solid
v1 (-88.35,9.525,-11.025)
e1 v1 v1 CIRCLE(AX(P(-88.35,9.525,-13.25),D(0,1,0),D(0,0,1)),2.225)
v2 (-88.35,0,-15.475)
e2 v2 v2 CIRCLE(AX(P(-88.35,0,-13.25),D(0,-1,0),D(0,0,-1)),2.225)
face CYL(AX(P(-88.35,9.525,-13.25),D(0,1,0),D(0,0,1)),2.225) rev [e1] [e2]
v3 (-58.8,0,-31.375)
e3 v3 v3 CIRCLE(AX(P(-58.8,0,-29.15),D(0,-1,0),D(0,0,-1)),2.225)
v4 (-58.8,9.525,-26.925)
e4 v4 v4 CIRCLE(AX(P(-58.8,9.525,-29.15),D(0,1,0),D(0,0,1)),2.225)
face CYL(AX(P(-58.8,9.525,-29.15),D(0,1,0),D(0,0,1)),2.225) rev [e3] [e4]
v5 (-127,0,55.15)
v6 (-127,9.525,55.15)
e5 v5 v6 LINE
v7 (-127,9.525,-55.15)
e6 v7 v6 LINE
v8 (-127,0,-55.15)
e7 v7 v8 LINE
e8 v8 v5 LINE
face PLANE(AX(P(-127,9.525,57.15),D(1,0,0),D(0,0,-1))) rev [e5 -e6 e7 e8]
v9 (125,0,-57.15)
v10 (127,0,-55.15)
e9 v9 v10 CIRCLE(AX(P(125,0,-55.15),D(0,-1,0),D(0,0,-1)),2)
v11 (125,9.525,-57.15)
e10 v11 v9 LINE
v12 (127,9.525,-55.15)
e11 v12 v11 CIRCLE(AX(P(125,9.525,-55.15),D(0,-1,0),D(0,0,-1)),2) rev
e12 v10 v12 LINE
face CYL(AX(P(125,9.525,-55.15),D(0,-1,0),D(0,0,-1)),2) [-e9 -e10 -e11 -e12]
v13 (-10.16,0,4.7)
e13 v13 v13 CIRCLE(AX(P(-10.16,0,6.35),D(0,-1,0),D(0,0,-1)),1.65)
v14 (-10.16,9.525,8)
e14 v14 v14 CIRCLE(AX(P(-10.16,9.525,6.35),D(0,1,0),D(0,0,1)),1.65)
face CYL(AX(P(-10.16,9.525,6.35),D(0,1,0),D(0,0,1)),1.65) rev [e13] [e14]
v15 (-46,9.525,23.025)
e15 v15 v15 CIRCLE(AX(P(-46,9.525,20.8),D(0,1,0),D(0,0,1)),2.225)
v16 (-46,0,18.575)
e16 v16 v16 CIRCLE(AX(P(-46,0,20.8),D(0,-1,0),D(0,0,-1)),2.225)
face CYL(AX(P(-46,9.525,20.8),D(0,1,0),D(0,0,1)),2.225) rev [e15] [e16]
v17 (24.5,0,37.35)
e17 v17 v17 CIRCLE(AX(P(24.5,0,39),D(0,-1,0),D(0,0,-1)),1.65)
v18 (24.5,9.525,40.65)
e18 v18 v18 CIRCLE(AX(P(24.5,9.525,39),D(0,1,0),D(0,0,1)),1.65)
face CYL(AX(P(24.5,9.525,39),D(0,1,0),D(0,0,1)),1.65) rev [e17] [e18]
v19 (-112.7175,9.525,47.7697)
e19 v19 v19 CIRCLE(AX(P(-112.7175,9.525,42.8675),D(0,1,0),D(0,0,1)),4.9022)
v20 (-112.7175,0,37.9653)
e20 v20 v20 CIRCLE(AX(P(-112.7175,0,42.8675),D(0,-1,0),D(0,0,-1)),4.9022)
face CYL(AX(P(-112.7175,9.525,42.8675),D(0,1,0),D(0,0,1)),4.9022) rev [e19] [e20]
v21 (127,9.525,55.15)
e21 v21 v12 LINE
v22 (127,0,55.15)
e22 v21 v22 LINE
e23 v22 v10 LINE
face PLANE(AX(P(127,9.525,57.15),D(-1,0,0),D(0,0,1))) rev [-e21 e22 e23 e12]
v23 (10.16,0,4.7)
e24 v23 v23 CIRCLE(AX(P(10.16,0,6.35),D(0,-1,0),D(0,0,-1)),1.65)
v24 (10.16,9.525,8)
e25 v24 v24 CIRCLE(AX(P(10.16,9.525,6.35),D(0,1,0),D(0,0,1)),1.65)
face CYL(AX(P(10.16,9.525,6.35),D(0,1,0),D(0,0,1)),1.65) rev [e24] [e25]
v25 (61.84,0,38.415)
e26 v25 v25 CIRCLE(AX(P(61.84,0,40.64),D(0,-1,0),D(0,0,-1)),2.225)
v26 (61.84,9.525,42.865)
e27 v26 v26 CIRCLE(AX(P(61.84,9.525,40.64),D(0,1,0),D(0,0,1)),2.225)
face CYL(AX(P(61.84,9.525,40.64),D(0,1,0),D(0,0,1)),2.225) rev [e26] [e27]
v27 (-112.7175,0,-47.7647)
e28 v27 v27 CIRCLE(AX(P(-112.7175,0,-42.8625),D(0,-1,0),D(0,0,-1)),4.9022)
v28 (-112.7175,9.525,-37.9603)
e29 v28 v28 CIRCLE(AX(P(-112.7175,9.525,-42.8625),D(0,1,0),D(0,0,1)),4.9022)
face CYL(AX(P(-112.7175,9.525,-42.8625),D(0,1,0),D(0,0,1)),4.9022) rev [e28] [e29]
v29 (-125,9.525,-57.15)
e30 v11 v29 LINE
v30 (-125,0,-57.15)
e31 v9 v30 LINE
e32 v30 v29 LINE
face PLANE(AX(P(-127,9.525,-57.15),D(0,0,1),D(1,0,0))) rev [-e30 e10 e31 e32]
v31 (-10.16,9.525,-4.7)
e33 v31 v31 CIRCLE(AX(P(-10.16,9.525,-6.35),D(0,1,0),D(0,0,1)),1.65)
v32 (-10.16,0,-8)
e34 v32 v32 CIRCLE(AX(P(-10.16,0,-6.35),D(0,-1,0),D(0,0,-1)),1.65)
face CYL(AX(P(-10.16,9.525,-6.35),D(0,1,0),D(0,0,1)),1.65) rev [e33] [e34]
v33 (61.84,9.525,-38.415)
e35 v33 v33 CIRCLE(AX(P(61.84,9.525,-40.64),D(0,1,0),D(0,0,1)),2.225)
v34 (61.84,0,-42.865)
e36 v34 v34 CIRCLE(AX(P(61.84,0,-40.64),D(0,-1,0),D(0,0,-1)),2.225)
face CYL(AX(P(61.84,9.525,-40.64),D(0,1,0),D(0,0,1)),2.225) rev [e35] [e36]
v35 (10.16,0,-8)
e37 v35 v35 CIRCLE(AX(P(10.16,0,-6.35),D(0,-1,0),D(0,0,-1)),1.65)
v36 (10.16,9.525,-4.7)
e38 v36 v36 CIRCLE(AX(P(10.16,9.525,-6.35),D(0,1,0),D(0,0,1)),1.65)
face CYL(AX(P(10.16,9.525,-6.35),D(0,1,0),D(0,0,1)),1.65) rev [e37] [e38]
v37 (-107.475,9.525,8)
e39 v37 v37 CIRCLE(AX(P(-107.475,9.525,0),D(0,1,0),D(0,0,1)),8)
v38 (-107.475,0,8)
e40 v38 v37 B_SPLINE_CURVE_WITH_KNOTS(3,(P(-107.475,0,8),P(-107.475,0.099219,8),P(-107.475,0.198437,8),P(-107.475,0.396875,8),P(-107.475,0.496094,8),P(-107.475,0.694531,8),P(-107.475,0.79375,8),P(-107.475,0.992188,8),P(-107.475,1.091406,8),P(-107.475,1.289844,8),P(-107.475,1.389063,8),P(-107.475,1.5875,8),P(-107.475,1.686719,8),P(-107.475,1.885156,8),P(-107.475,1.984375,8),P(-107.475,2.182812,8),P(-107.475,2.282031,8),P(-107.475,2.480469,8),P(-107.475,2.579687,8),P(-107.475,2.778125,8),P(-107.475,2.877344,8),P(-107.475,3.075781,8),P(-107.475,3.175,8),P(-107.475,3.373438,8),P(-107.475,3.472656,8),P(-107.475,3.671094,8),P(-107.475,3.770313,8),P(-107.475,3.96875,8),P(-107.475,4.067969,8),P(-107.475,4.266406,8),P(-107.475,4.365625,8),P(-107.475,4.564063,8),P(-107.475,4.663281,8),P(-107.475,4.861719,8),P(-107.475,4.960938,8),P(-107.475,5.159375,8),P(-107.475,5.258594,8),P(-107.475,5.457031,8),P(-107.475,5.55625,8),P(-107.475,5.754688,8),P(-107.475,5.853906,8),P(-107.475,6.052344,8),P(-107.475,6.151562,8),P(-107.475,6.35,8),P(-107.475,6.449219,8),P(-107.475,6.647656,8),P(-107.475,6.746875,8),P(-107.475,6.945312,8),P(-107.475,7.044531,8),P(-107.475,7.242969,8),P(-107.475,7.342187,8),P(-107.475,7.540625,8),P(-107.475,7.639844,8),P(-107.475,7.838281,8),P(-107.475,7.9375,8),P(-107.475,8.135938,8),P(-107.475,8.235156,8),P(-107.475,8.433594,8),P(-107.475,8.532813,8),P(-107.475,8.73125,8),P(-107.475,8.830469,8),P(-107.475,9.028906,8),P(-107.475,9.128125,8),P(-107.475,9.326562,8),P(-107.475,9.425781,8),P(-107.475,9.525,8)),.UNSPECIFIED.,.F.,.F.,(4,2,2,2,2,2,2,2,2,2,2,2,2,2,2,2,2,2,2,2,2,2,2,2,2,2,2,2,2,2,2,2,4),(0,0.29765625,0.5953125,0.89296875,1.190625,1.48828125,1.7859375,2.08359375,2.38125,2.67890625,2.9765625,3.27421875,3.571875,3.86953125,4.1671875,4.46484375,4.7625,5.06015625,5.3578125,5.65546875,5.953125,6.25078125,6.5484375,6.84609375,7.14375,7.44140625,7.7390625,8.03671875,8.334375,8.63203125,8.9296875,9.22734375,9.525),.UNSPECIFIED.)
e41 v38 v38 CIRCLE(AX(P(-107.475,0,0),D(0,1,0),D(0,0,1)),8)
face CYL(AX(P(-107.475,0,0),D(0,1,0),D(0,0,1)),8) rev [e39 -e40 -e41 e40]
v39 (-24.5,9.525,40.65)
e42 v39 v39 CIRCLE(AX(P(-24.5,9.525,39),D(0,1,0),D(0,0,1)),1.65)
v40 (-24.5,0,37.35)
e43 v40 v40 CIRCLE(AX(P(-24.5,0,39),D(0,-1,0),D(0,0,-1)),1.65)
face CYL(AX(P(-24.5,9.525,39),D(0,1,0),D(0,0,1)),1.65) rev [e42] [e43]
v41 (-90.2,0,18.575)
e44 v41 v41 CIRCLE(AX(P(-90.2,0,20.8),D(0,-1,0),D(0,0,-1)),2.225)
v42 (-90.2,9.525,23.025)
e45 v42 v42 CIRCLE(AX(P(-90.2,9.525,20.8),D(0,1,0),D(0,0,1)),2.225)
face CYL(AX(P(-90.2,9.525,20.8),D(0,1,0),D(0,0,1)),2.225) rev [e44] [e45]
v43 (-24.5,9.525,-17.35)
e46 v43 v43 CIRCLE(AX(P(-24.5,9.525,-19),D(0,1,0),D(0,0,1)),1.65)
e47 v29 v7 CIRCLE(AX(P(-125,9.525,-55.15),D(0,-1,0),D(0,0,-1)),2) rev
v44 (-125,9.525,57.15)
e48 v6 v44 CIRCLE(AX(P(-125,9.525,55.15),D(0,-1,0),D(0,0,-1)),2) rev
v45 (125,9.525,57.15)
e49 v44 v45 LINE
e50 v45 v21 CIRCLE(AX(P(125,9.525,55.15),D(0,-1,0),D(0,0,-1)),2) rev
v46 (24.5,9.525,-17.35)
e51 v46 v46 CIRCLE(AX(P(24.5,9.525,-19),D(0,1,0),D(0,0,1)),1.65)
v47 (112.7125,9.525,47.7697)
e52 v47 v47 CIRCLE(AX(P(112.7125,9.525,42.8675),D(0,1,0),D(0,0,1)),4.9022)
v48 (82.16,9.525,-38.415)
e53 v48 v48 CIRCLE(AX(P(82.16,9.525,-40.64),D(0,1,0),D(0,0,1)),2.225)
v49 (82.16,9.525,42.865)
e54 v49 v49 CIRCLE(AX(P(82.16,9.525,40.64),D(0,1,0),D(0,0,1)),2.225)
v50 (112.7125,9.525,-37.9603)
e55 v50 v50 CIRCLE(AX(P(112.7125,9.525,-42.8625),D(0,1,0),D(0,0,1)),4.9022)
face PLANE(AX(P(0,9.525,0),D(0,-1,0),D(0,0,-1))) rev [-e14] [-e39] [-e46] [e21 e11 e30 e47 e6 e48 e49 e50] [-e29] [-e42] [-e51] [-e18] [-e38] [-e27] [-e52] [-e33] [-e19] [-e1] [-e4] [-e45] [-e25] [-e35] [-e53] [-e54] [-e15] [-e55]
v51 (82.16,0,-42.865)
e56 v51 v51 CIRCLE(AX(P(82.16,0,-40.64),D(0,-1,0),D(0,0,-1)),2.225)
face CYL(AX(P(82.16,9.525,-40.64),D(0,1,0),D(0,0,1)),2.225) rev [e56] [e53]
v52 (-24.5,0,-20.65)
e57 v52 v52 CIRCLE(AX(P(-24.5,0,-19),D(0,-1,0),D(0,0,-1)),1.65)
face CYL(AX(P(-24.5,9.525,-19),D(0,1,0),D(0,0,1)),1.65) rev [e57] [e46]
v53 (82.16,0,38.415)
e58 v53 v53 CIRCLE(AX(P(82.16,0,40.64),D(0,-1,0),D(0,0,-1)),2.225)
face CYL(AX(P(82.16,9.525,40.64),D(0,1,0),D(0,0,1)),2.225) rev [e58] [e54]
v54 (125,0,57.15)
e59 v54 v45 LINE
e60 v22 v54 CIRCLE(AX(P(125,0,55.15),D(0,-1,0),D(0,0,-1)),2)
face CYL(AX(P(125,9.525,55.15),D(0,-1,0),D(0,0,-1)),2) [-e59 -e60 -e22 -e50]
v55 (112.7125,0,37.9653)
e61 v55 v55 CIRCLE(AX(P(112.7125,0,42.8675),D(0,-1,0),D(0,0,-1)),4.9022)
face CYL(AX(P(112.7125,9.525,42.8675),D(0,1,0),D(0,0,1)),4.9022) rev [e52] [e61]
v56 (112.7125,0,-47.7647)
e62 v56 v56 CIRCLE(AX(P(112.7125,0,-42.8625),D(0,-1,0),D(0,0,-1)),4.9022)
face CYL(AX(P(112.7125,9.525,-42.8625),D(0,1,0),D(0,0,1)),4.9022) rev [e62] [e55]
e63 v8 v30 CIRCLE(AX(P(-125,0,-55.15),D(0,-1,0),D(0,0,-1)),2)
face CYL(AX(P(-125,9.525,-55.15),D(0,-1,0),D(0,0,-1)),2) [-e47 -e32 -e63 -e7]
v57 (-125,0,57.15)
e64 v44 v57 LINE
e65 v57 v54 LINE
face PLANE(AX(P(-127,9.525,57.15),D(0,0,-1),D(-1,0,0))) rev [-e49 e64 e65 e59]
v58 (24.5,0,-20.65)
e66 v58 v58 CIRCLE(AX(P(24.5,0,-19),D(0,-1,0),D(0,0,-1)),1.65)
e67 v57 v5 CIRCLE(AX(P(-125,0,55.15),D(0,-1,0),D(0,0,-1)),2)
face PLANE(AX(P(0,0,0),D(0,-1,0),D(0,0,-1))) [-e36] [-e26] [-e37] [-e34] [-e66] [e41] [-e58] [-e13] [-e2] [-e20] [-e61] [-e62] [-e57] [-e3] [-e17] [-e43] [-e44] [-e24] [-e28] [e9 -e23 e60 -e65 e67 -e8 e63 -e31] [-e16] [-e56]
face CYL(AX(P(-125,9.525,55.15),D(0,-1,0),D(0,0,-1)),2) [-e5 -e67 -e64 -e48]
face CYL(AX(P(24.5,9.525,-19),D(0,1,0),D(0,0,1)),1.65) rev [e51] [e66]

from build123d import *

# Parameters (mm, degrees)
SKETCH1_W                      = 254
SKETCH1_H                      = 114.3
BOSS_EXTRUDE1_DEPTH            = 9.525
F_3_8_CLEARANCE_HOLE1_D        = 9.8044
F_3_8_CLEARANCE_HOLE1_DEPTH    = 10
F_3_8_CLEARANCE_HOLE1_TIP      = 2.945538927
M2_5_CLEARANCE_HOLE3_D         = 3.3
M2_5_CLEARANCE_HOLE3_DEPTH     = 10
M2_5_CLEARANCE_HOLE3_TIP       = 0.991420021
FILLET1_R                      = 2
M3_CLEARANCE_HOLE4_D           = 4.45
M3_CLEARANCE_HOLE4_DEPTH       = 10
M3_CLEARANCE_HOLE4_TIP         = 1.336914877
SKETCH22_R                     = 8
CUT_EXTRUDE1_DEPTH             = 140.5917194
M3_CLEARANCE_HOLE5_D           = 4.45
M3_CLEARANCE_HOLE5_DEPTH       = 10
M3_CLEARANCE_HOLE5_TIP         = 1.336914877
M2_5_CLEARANCE_HOLE4_OUTLINE_R = 1.65
M2_5_CLEARANCE_HOLE4_DEPTH     = 9.525


# Read off the part's stored shape, not the designer's step: M2.5 Clearance Hole4
with BuildPart() as part:
    # Sketch1 → Boss-Extrude1 (new body)
    with BuildSketch(Plane(origin=(0, 0, 0), x_dir=(1, 0, 0), z_dir=(0, 1, 0))):
        Rectangle(SKETCH1_W, SKETCH1_H)
    extrude(amount=BOSS_EXTRUDE1_DEPTH)

    # 3/8 Clearance Hole1
    with Locations(Plane(origin=(0, 9.525, 0), x_dir=(1, 0, 0), z_dir=(0, 1, 0))):
        with Locations((112.7125, 42.8625), (112.7125, -42.8675), (-112.7175, 42.8625), (-112.7175, -42.8675)):
            Hole(F_3_8_CLEARANCE_HOLE1_D / 2, depth=F_3_8_CLEARANCE_HOLE1_DEPTH)
            with Locations((0, 0, -(F_3_8_CLEARANCE_HOLE1_DEPTH + F_3_8_CLEARANCE_HOLE1_TIP / 2))):  # 118° drill point
                Cone(0, F_3_8_CLEARANCE_HOLE1_D / 2, F_3_8_CLEARANCE_HOLE1_TIP, mode=Mode.SUBTRACT)

    # M2.5 Clearance Hole3
    with Locations(Plane(origin=(0, 9.525, 0), x_dir=(1, 0, 0), z_dir=(0, 1, 0))):
        with Locations((24.5, 19), (-24.5, -39), (24.5, -39), (-24.5, 19)):
            Hole(M2_5_CLEARANCE_HOLE3_D / 2, depth=M2_5_CLEARANCE_HOLE3_DEPTH)
            with Locations((0, 0, -(M2_5_CLEARANCE_HOLE3_DEPTH + M2_5_CLEARANCE_HOLE3_TIP / 2))):  # 118° drill point
                Cone(0, M2_5_CLEARANCE_HOLE3_D / 2, M2_5_CLEARANCE_HOLE3_TIP, mode=Mode.SUBTRACT)

    # Fillet1
    fillet1_edges = [part.edges().sort_by_distance(p)[0] for p in [
        (127, 4.7625, 57.15),
        (-127, 4.7625, 57.15),
        (-127, 4.7625, -57.15),
        (127, 4.7625, -57.15),
    ]]
    fillet(fillet1_edges, radius=FILLET1_R)

    # M3 Clearance Hole4
    with Locations(Plane(origin=(0, 9.525, 0), x_dir=(1, 0, 0), z_dir=(0, 1, 0))):
        with Locations((-58.8, 29.15), (-46, -20.8), (-90.2, -20.8), (-88.35, 13.25)):
            Hole(M3_CLEARANCE_HOLE4_D / 2, depth=M3_CLEARANCE_HOLE4_DEPTH)
            with Locations((0, 0, -(M3_CLEARANCE_HOLE4_DEPTH + M3_CLEARANCE_HOLE4_TIP / 2))):  # 118° drill point
                Cone(0, M3_CLEARANCE_HOLE4_D / 2, M3_CLEARANCE_HOLE4_TIP, mode=Mode.SUBTRACT)

    # Sketch22 → Cut-Extrude1 (cut, through all)
    with BuildSketch(Plane(origin=(0, 9.525, 0), x_dir=(1, 0, 0), z_dir=(0, 1, 0))):
        with Locations(Location((-107.475, 0, 0), (0, 0, 270))):
            Circle(SKETCH22_R)
    extrude(amount=-CUT_EXTRUDE1_DEPTH, mode=Mode.SUBTRACT)

    # M3 Clearance Hole5
    with Locations(Plane(origin=(0, 9.525, 0), x_dir=(1, 0, 0), z_dir=(0, 1, 0))):
        with Locations((61.84, 40.64), (61.84, -40.64), (82.16, -40.64), (82.16, 40.64)):
            Hole(M3_CLEARANCE_HOLE5_D / 2, depth=M3_CLEARANCE_HOLE5_DEPTH)
            with Locations((0, 0, -(M3_CLEARANCE_HOLE5_DEPTH + M3_CLEARANCE_HOLE5_TIP / 2))):  # 118° drill point
                Cone(0, M3_CLEARANCE_HOLE5_D / 2, M3_CLEARANCE_HOLE5_TIP, mode=Mode.SUBTRACT)

    # M2.5 Clearance Hole4 outline → M2.5 Clearance Hole4 (cut)
    with BuildSketch(Plane(origin=(0, 0, 0), x_dir=(1, 0, 0), z_dir=(0, 1, 0))):
        with Locations((-10.16, 6.35)):
            Circle(M2_5_CLEARANCE_HOLE4_OUTLINE_R)
        with Locations((10.16, 6.35)):
            Circle(M2_5_CLEARANCE_HOLE4_OUTLINE_R)
        with Locations((10.16, -6.35)):
            Circle(M2_5_CLEARANCE_HOLE4_OUTLINE_R)
        with Locations((-10.16, -6.35)):
            Circle(M2_5_CLEARANCE_HOLE4_OUTLINE_R)
    extrude(amount=M2_5_CLEARANCE_HOLE4_DEPTH, mode=Mode.SUBTRACT)


solid = part.part
